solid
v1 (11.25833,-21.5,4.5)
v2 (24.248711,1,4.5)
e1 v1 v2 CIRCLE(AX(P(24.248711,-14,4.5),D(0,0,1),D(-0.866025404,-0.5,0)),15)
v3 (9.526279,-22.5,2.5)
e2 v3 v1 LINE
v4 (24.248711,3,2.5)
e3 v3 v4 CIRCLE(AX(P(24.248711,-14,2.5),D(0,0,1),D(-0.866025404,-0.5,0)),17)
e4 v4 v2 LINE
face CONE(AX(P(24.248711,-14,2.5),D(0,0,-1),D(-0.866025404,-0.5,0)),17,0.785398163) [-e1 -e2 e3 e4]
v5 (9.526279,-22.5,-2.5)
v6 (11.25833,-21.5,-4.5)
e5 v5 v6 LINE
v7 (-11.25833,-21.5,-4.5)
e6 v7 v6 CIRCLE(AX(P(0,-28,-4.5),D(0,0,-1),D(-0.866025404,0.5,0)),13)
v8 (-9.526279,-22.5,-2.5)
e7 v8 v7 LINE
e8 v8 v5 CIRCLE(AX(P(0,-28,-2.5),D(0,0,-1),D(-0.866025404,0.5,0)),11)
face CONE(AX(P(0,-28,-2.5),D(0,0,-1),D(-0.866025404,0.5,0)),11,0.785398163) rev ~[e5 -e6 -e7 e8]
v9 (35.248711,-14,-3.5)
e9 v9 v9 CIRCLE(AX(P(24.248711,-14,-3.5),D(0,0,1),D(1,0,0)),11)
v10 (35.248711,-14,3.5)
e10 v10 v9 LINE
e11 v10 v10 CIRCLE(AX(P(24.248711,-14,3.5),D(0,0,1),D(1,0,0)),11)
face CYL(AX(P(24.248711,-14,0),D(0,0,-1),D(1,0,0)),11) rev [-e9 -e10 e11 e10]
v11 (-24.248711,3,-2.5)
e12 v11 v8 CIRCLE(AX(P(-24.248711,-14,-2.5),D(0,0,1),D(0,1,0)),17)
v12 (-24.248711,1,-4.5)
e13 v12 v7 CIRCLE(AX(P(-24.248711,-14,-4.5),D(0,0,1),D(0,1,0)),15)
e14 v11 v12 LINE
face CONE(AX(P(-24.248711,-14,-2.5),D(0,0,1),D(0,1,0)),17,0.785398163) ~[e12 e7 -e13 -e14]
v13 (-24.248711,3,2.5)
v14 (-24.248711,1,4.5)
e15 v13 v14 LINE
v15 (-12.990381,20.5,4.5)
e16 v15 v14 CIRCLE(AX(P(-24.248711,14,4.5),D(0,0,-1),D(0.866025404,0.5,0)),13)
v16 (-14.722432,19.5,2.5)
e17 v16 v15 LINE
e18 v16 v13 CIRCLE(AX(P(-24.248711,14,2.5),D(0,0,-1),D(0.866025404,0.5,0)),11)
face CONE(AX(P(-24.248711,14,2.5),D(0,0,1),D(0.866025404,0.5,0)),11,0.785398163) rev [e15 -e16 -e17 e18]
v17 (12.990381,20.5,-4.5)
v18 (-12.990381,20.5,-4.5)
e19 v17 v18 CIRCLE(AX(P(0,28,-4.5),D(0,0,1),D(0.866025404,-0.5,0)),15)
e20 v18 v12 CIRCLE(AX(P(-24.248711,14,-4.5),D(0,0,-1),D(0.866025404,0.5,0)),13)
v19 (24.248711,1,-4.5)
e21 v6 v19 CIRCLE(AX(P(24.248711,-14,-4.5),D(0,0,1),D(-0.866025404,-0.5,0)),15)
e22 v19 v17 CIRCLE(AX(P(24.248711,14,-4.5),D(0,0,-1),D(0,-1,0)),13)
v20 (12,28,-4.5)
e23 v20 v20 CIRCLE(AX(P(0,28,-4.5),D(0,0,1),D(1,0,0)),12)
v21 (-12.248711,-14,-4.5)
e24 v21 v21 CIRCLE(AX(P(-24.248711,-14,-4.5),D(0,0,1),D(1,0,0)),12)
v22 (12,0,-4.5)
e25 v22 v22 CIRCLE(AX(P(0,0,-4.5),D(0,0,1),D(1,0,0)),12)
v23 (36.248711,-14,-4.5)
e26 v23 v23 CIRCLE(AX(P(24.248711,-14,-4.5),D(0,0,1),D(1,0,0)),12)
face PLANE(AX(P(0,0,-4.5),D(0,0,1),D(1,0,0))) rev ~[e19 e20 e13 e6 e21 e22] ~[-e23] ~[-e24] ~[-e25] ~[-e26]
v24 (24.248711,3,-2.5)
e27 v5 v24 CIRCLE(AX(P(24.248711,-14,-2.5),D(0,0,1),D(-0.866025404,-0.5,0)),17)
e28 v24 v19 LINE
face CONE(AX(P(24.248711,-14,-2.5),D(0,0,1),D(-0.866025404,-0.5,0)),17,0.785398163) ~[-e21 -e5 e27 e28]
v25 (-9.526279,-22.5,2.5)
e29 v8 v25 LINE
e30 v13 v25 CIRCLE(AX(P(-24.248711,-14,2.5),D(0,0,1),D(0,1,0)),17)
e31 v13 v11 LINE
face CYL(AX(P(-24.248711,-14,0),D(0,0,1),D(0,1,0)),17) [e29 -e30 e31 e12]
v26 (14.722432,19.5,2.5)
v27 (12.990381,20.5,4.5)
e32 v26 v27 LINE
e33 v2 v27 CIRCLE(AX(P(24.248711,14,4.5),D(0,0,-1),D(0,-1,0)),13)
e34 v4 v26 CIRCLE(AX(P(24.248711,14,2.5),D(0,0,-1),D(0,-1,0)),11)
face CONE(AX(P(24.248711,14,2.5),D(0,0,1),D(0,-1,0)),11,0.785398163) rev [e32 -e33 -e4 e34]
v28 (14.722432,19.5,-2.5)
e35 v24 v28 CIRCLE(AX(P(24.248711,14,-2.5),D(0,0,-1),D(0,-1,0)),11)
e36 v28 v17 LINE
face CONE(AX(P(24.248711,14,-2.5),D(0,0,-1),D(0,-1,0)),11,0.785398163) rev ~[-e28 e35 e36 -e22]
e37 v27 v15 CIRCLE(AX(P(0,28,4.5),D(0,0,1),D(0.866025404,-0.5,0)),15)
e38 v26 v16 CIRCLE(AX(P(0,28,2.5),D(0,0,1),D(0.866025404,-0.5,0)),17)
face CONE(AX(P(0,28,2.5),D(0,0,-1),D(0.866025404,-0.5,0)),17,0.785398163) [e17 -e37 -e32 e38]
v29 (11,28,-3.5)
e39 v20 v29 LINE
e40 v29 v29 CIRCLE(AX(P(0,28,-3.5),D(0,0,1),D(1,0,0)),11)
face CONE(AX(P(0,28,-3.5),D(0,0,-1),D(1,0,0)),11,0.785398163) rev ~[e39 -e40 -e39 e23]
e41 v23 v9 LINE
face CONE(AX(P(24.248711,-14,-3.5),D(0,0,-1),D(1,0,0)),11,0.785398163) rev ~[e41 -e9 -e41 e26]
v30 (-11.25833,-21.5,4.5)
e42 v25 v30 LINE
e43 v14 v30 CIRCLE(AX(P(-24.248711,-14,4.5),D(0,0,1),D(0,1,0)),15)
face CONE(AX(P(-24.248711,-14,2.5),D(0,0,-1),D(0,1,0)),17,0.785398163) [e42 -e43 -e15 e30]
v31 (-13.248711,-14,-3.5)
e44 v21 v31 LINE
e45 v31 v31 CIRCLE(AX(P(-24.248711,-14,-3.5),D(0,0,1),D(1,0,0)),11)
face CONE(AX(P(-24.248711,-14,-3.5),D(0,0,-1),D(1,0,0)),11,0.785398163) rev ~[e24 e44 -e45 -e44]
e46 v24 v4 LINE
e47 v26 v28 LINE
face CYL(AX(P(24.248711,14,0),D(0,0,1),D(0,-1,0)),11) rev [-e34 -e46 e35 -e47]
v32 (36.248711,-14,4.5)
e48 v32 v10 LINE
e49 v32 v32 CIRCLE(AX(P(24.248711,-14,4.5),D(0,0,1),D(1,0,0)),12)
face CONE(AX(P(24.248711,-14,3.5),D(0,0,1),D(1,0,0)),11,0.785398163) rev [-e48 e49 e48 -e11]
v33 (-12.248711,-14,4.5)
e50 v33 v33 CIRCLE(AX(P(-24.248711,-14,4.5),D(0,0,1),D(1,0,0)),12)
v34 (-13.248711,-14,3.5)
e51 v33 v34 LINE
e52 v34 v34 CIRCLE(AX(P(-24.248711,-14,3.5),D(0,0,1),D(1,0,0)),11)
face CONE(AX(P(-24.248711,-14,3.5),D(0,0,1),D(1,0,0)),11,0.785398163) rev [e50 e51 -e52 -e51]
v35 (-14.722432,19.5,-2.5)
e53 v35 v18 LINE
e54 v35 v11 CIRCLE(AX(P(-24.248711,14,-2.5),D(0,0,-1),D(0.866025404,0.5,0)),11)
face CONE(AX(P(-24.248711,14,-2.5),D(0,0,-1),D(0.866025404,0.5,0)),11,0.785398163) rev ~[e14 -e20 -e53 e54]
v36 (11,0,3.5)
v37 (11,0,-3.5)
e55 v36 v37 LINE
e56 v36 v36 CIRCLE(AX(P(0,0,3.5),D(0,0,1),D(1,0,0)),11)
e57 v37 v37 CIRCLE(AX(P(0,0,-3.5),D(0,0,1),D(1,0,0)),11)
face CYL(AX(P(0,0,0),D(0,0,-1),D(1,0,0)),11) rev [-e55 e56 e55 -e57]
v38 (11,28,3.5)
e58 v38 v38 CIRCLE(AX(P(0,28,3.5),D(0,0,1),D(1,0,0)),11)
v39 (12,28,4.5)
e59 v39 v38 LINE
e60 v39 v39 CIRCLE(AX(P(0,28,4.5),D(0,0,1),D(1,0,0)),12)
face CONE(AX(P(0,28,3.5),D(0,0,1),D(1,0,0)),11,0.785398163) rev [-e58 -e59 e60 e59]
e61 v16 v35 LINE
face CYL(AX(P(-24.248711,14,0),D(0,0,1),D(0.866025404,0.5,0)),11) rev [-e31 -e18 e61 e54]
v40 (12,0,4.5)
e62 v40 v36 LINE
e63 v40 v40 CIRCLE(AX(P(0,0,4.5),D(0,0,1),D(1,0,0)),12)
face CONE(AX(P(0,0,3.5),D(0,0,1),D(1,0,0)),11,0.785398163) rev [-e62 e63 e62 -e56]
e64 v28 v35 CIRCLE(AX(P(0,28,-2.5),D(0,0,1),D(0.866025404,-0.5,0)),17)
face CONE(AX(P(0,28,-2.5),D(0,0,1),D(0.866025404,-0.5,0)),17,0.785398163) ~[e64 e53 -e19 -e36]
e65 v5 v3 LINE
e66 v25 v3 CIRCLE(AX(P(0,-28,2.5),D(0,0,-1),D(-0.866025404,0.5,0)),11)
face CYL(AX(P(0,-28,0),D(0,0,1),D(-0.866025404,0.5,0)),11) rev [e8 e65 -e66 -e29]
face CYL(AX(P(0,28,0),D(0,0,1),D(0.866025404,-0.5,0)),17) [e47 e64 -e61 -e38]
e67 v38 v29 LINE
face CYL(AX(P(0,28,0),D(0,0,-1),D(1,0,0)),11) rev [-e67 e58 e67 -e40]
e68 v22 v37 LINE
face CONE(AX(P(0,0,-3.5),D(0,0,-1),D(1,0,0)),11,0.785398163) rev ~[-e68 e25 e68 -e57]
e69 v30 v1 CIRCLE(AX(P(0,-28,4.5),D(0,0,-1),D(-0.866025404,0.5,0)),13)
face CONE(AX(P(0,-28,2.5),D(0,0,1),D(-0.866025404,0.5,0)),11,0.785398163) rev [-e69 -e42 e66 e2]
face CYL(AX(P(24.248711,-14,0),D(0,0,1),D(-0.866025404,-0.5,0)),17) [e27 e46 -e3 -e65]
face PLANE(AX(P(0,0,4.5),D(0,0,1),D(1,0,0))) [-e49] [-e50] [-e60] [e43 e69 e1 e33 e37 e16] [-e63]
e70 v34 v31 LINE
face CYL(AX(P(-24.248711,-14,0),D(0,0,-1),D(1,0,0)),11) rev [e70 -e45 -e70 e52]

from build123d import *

# Parameters (mm, degrees)
F0_R     = 11
F1_DEPTH = 4.5
F4_SIZE  = 2
F5_SIZE  = 1


# Not quite as in the source:
# - a feature of the source that left no trace in its solid (it failed there, or was rolled back) is left out


with BuildPart() as f1:
    # F0 (on Top) → F1 (new body, symmetric)
    with BuildSketch(Plane.XY):
        with BuildLine():
            ThreePointArc((-24.248711306, 3), (-38.9711431703, -22.5), (-9.5262794416, -22.5))
            ThreePointArc((-9.5262794416, -22.5), (0, -17), (9.5262794416, -22.5))
            ThreePointArc((9.5262794416, -22.5), (38.9711431703, -22.5), (24.248711306, 3))
            ThreePointArc((24.248711306, 3), (14.7224318643, 8.5), (14.7224318643, 19.5))
            ThreePointArc((14.7224318643, 19.5), (0, 45), (-14.7224318643, 19.5))
            ThreePointArc((-14.7224318643, 19.5), (-14.7224318643, 8.5), (-24.248711306, 3))
        make_face()
        with Locations((-24.248711306, -14)):
            Circle(F0_R, mode=Mode.SUBTRACT)
        with Locations((24.248711306, -14)):
            Circle(F0_R, mode=Mode.SUBTRACT)
        Circle(F0_R, mode=Mode.SUBTRACT)
        with Locations((0, 28)):
            Circle(F0_R, mode=Mode.SUBTRACT)
    extrude(amount=F1_DEPTH, both=True)

    # F4
    f4_edges = [f1.edges().sort_by_distance(p)[0] for p in [
        (-38.971143, -22.5, 4.5),
        (-38.971143, -22.5, -4.5),
        (-14.722432, 8.5, -4.5),
        (-14.722432, 8.5, 4.5),
        (0, 45, -4.5),
        (0, 45, 4.5),
        (14.722432, 8.5, -4.5),
        (14.722432, 8.5, 4.5),
        (38.971143, -22.5, -4.5),
        (38.971143, -22.5, 4.5),
        (0, -17, -4.5),
        (0, -17, 4.5),
    ]]
    chamfer(f4_edges, length=F4_SIZE)

    # F5
    f5_edges = [f1.edges().sort_by_distance(p)[0] for p in [
        (-35.248711, -14, 4.5),
        (-13.248711, -14, 0),
        (-35.248711, -14, -4.5),
        (-11, 0, 4.5),
        (11, 0, 0),
        (-11, 0, -4.5),
        (-11, 28, 4.5),
        (11, 28, 0),
        (-11, 28, -4.5),
        (13.248711, -14, 4.5),
        (35.248711, -14, 0),
        (13.248711, -14, -4.5),
    ]]
    chamfer(f5_edges, length=F5_SIZE)


solid = f1.part
